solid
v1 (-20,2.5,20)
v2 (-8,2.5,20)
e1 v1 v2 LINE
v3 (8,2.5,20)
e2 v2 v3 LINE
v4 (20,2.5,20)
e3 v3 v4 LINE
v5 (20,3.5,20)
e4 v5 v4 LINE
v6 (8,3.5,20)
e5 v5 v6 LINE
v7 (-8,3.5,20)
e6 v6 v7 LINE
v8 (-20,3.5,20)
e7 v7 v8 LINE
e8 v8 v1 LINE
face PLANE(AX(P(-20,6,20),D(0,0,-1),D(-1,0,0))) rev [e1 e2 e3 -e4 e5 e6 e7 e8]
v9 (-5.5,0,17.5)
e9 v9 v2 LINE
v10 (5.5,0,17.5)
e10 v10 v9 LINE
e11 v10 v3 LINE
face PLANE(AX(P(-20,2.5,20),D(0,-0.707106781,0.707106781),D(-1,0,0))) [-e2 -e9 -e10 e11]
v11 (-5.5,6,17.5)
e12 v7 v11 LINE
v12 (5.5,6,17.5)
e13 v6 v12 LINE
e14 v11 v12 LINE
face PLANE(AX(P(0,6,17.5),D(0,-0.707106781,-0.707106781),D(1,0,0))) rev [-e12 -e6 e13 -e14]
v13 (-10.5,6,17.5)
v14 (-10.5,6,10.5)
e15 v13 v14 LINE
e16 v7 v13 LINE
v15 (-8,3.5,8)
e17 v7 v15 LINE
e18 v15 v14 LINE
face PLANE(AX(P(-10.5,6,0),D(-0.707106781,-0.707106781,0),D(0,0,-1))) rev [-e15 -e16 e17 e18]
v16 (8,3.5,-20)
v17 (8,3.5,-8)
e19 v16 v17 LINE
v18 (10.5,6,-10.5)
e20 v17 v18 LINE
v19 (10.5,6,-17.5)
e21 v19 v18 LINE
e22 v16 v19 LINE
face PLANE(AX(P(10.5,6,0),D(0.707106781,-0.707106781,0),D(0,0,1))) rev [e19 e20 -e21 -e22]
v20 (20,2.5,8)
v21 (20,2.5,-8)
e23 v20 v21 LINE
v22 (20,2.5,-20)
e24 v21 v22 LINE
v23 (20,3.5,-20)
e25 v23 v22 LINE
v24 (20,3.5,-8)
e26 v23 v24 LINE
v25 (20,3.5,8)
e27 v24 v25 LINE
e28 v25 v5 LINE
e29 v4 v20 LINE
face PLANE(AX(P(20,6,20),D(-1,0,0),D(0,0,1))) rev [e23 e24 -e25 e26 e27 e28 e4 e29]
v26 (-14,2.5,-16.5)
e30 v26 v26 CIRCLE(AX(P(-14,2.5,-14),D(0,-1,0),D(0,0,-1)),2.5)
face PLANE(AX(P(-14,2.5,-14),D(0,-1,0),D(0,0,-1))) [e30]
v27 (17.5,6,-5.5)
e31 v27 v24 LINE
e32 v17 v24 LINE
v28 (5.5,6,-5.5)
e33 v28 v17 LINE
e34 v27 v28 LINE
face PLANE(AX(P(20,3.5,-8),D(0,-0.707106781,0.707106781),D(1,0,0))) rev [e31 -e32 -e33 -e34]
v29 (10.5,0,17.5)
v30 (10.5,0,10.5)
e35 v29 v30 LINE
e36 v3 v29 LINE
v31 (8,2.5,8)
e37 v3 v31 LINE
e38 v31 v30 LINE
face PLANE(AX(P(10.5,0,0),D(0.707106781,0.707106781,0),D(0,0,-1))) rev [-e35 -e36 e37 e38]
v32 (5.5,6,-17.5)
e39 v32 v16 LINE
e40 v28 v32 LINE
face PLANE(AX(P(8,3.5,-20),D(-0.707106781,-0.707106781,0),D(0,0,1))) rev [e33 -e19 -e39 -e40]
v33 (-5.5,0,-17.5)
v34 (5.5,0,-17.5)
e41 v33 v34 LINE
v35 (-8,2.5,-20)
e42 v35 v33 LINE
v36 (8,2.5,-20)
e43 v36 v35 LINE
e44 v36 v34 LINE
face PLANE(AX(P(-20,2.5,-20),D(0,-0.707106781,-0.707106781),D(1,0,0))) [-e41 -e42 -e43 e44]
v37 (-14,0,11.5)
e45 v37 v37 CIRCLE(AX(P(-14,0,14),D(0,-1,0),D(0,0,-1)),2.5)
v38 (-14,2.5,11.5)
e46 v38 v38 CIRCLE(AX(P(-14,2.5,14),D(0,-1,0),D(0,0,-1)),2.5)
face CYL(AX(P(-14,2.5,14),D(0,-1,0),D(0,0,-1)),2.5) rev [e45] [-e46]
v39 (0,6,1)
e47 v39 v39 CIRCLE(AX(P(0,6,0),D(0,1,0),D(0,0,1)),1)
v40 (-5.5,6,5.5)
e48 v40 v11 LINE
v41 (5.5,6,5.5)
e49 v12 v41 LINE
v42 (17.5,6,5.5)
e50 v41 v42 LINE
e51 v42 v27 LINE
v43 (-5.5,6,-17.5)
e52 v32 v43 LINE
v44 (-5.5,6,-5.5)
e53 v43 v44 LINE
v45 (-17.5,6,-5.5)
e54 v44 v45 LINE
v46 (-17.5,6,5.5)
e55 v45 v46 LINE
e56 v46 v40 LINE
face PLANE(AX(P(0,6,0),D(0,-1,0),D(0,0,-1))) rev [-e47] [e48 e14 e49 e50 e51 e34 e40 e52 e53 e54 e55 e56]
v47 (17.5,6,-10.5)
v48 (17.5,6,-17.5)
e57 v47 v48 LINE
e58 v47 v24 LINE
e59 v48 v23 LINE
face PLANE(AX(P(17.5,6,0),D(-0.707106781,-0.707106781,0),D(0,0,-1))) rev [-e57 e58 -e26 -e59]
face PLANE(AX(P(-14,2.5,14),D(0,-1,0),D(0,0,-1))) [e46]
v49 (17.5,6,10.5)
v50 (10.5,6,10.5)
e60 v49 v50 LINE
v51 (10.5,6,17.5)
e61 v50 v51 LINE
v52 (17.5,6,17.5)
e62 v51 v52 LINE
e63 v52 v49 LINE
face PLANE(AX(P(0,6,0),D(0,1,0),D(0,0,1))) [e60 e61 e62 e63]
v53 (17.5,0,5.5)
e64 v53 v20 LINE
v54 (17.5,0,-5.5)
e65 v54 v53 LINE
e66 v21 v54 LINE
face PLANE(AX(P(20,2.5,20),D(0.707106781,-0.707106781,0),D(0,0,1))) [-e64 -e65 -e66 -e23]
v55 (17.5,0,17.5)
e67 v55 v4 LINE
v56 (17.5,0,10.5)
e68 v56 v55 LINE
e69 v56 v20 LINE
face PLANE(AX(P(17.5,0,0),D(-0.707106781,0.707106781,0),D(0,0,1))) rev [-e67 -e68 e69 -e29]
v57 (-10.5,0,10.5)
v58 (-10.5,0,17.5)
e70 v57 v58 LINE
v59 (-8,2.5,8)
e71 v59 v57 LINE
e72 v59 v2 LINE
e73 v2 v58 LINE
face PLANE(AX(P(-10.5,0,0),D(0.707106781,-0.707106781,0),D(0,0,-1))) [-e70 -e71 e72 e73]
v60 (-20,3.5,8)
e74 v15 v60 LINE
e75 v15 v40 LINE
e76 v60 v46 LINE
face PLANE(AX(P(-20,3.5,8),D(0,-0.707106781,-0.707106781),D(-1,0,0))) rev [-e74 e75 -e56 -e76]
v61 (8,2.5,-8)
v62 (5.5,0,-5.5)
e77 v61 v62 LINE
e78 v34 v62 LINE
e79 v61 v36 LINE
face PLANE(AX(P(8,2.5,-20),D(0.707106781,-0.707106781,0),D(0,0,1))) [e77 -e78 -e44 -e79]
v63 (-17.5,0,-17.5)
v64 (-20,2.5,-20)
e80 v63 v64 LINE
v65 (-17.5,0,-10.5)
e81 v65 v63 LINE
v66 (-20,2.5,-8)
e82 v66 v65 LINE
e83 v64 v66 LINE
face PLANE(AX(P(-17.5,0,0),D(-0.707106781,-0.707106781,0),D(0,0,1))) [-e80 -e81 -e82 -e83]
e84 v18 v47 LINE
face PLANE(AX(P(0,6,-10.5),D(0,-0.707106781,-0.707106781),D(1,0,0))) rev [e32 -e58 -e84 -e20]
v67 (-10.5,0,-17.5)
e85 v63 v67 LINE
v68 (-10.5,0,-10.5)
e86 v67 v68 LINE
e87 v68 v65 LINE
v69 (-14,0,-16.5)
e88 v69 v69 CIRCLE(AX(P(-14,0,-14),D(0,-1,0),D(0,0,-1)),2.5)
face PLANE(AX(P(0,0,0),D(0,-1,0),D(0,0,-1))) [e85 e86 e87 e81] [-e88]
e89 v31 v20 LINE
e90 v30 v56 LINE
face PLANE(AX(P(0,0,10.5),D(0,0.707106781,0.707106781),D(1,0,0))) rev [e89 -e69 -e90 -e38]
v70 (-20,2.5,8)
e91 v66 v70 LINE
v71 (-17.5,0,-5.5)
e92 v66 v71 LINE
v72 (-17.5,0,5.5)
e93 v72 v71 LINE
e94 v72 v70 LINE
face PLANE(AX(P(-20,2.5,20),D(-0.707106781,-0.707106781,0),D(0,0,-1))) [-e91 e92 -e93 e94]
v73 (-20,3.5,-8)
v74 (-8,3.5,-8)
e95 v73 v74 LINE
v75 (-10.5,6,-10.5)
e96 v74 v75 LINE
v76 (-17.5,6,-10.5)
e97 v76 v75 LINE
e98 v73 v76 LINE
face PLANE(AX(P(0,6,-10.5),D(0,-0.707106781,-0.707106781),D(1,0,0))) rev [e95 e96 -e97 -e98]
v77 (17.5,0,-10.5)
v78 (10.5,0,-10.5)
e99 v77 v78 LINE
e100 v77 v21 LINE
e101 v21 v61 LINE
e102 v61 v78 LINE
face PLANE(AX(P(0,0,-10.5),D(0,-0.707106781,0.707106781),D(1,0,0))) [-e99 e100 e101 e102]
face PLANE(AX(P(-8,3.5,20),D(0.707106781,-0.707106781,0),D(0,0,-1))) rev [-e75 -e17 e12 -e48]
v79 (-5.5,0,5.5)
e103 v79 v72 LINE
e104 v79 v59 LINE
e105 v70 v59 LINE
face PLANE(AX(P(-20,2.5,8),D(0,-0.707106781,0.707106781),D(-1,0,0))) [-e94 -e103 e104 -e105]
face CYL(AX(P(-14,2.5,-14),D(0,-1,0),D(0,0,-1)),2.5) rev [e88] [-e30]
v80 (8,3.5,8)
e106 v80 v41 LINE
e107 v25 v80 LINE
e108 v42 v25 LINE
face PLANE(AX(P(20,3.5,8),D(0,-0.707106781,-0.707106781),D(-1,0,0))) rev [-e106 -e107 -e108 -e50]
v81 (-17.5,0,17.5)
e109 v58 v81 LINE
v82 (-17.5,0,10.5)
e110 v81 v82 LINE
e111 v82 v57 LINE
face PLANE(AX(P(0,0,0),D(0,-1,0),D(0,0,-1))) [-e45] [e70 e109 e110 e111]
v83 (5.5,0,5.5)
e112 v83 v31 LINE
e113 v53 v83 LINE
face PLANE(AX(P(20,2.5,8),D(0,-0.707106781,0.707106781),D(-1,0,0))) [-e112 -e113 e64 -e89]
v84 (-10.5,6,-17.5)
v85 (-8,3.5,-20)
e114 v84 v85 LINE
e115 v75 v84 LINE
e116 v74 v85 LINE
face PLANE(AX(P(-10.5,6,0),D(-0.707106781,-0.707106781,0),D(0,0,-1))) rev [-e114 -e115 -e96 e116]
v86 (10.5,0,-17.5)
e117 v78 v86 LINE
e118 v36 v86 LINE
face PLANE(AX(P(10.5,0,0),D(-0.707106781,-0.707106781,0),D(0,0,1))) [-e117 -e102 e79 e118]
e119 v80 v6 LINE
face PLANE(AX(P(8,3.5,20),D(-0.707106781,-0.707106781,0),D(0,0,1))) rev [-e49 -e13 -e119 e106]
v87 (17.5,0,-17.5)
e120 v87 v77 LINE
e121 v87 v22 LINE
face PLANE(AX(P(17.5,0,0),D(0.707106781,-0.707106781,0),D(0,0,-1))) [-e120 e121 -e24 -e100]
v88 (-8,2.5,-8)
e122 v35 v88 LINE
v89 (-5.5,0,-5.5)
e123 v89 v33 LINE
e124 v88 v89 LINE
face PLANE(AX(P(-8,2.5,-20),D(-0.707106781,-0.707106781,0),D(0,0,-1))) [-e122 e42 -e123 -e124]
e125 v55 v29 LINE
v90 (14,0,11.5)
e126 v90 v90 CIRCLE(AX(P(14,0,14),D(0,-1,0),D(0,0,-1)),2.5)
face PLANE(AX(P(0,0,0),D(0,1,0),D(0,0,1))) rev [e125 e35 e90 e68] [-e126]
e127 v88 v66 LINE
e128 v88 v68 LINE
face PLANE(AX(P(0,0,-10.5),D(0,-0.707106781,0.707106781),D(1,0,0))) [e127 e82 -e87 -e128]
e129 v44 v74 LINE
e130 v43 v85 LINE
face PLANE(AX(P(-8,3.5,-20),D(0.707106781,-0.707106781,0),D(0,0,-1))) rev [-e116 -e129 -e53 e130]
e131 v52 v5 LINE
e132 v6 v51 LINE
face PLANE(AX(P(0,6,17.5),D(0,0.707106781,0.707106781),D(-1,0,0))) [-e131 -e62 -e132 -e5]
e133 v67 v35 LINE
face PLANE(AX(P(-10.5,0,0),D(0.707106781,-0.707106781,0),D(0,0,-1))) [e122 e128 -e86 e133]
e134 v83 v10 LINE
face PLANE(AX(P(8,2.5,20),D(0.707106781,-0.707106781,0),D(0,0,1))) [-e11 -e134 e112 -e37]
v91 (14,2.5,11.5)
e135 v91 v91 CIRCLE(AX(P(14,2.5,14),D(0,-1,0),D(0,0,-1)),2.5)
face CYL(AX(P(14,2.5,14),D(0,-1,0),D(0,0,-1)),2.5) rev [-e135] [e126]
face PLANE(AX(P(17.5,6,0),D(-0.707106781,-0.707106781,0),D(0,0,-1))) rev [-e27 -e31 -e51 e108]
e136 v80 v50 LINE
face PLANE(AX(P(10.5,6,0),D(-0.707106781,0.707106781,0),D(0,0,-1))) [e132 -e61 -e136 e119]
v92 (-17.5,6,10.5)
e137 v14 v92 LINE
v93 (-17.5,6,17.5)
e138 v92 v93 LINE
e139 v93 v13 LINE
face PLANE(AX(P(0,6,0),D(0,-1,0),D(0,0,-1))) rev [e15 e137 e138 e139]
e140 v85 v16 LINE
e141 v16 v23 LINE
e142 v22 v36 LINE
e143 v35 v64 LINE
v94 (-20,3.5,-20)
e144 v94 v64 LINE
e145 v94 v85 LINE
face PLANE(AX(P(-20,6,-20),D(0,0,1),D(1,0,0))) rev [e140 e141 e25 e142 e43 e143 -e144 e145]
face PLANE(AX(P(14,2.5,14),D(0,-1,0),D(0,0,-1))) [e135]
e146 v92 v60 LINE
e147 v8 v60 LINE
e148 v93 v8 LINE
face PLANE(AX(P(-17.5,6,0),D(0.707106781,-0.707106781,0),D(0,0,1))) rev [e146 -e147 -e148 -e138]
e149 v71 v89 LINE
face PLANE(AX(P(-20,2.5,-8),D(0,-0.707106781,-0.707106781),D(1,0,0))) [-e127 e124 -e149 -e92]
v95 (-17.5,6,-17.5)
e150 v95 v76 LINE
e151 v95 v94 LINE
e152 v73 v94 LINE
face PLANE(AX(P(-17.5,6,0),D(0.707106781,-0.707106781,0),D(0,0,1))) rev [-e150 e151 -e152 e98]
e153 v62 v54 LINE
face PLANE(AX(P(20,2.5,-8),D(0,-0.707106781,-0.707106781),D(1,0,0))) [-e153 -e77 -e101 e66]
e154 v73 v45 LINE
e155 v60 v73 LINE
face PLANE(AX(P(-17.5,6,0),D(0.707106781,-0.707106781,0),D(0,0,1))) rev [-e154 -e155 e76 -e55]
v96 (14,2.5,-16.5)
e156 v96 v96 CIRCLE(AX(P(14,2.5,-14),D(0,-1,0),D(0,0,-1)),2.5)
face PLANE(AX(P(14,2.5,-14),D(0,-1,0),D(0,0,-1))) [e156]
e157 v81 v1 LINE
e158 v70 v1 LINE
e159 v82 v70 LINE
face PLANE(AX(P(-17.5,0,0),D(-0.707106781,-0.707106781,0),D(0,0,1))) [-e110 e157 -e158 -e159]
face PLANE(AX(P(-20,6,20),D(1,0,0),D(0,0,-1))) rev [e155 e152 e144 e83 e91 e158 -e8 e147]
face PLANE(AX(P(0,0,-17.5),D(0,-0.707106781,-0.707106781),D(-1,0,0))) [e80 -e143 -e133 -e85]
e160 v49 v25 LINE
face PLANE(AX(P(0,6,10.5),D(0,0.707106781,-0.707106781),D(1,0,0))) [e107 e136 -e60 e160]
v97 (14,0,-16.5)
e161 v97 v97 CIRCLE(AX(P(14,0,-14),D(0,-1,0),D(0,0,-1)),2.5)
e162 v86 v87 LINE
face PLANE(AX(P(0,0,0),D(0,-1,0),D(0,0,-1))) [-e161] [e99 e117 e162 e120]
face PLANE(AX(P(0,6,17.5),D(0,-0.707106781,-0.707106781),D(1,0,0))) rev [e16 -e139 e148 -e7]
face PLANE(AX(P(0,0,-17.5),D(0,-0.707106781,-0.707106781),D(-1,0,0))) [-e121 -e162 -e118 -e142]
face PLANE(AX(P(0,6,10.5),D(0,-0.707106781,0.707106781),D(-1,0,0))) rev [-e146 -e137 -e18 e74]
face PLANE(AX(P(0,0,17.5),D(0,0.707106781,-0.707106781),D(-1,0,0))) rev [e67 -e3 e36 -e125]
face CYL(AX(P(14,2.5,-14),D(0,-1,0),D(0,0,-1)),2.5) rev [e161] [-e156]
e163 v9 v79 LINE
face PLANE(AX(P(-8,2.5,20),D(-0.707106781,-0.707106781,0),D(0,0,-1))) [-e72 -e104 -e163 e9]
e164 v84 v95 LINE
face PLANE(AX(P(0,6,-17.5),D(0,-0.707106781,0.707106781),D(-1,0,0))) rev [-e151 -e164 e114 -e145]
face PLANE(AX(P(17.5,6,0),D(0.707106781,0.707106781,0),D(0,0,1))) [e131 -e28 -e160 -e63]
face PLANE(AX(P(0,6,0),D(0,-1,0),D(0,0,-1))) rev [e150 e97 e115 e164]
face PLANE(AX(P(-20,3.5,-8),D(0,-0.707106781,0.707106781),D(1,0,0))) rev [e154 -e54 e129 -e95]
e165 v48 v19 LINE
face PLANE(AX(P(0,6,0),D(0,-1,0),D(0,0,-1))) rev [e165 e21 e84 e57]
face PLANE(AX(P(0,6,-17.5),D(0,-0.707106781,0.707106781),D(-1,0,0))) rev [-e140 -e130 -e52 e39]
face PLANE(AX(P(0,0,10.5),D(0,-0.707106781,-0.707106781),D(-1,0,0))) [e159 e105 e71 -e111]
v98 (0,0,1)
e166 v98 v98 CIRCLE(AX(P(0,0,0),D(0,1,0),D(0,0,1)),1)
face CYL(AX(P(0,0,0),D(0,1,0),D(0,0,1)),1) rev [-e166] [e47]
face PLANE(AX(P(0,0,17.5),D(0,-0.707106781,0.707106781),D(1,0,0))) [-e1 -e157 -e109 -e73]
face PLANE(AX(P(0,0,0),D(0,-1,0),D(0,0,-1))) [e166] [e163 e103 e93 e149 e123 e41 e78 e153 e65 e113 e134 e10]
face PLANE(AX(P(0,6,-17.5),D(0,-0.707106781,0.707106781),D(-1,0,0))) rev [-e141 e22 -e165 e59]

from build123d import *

# Parameters (mm, degrees)
SKETCH1_W           = 40
SKETCH1_H           = 40
BOSS_EXTRUDE1_DEPTH = 6
SKETCH2_W           = 12
SKETCH2_H           = 12
CUT_EXTRUDE1_DEPTH  = 2.5
SKETCH3_W           = 12
SKETCH3_H           = 12
CUT_EXTRUDE2_DEPTH  = 2.5
CHAMFER1_SIZE       = 2.5
SKETCH4_W           = 12
SKETCH4_H           = 12
BOSS_EXTRUDE2_DEPTH = 2.5
SKETCH5_W           = 12
SKETCH5_H           = 12
BOSS_EXTRUDE3_DEPTH = 2.5
CHAMFER2_SIZE       = 2.5
SKETCH6_R           = 2.5
CUT_EXTRUDE3_DEPTH  = 2.5
SKETCH7_R           = 1
CUT_EXTRUDE4_DEPTH  = 29.91366459


# Some blends are built 0.0001 mm under size
with BuildPart() as part:
    # Sketch1 → Boss-Extrude1 (new body)
    with BuildSketch(Plane(origin=(0, 0, 0), x_dir=(1, 0, 0), z_dir=(0, 1, 0))):
        Rectangle(SKETCH1_W, SKETCH1_H)
    extrude(amount=BOSS_EXTRUDE1_DEPTH)

    # Sketch2 → Cut-Extrude1 (cut)
    with BuildSketch(Plane.XZ):
        with Locations((14, 14)):
            Rectangle(SKETCH2_W, SKETCH2_H)
        with Locations((-14, 14)):
            Rectangle(SKETCH2_W, SKETCH2_H)
        with Locations((14, -14)):
            Rectangle(SKETCH2_W, SKETCH2_H)
        with Locations((-14, -14)):
            Rectangle(SKETCH2_W, SKETCH2_H)
    extrude(amount=-CUT_EXTRUDE1_DEPTH, mode=Mode.SUBTRACT)

    # Sketch3 → Cut-Extrude2 (cut)
    with BuildSketch(Plane(origin=(0, 6, 0), x_dir=(1, 0, 0), z_dir=(0, 1, 0))):
        with Locations((14, 14)):
            Rectangle(SKETCH3_W, SKETCH3_H)
        with Locations((-14, 14)):
            Rectangle(SKETCH3_W, SKETCH3_H)
        with Locations((14, -14)):
            Rectangle(SKETCH3_W, SKETCH3_H)
        with Locations((-14, -14)):
            Rectangle(SKETCH3_W, SKETCH3_H)
    extrude(amount=-CUT_EXTRUDE2_DEPTH, mode=Mode.SUBTRACT)

    # Chamfer1
    chamfer1_edges = [part.edges().sort_by_distance(p)[0] for p in [
        (-14, 6, -8),
        (-8, 6, -14),
        (0, 6, -20),
        (8, 6, -14),
        (14, 6, -8),
        (20, 6, 0),
        (14, 6, 8),
        (8, 6, 14),
        (0, 6, 20),
        (-8, 6, 14),
        (-14, 6, 8),
        (-20, 6, 0),
        (-20, 0, 0),
        (-14, 0, 8),
        (-8, 0, 14),
        (0, 0, 20),
        (8, 0, 14),
        (14, 0, 8),
        (20, 0, 0),
        (14, 0, -8),
        (8, 0, -14),
        (0, 0, -20),
        (-8, 0, -14),
        (-14, 0, -8),
    ]]
    chamfer(chamfer1_edges, length=CHAMFER1_SIZE - 0.0001)  # a hair under: the kernel refuses the full size

    # Sketch4 → Boss-Extrude2 (add)
    with BuildSketch(Plane.XZ.offset(-2.5)):
        with Locations((14, -14)):
            Rectangle(SKETCH4_W, SKETCH4_H)
        with Locations((14, 14)):
            Rectangle(SKETCH4_W, SKETCH4_H)
        with Locations((-14, -14)):
            Rectangle(SKETCH4_W, SKETCH4_H)
        with Locations((-14, 14)):
            Rectangle(SKETCH4_W, SKETCH4_H)
    extrude(amount=BOSS_EXTRUDE2_DEPTH)

    # Sketch5 → Boss-Extrude3 (add)
    with BuildSketch(Plane(origin=(0, 3.5, 0), x_dir=(1, 0, 0), z_dir=(0, 1, 0))):
        with Locations((-14, -14)):
            Rectangle(SKETCH5_W, SKETCH5_H)
        with Locations((14, -14)):
            Rectangle(SKETCH5_W, SKETCH5_H)
        with Locations((-14, 14)):
            Rectangle(SKETCH5_W, SKETCH5_H)
        with Locations((14, 14)):
            Rectangle(SKETCH5_W, SKETCH5_H)
    extrude(amount=BOSS_EXTRUDE3_DEPTH)

    # Chamfer2
    # the kernel refuses this chamfer: 2.5 mm, written as the material it takes off along each edge
    with BuildSketch(Plane(origin=(8, 6, 8), x_dir=(0, -0.9996219169112968, -0.027495876610586317), z_dir=(1, 0, 0)), Plane(origin=(-26.42920747, 0, -8), x_dir=(0, 0.9996219169112968, 0.027495876610586317), z_dir=(1, 0, 0)), Plane(origin=(-8, 0, 8), x_dir=(0, 0.9996219169112968, -0.027495876610586317), z_dir=(-1, 0, 0)), Plane(origin=(-26.42920747, 6, -8), x_dir=(6.9547671466025935e-15, 0.027495876610586317, -0.9996219169112968), z_dir=(1, 0, 0))) as chamfer2_piece_1:
        Polygon((CHAMFER2_SIZE * 0.999621916911, -CHAMFER2_SIZE * 0.0274958766106), (-CHAMFER2_SIZE * 0.0274958766106, -CHAMFER2_SIZE * 0.999621916911), (0, 0), align=None)
    extrude(amount=18.42920747, mode=Mode.SUBTRACT)
    with BuildSketch(Plane(origin=(20, 6, 1.57079253), x_dir=(0.027495876610586317, -0.9996219169112968, -1.2780451150309794e-15), z_dir=(0, 0, 1)), Plane(origin=(26.42920747, 6, 20), x_dir=(0, -0.9996219169112968, 0.027495876610586317), z_dir=(-1, 0, 0)), Plane(origin=(-20, 0, 1.57079253), x_dir=(-0.027495876610586317, 0.9996219169112968, 0), z_dir=(0, 0, 1)), Plane(origin=(-26.42920747, 0, 20), x_dir=(0, 0.9996219169112968, 0.027495876610586317), z_dir=(1, 0, 0)), Plane(origin=(20, 0, 1.57079253), x_dir=(-0.9996219169112968, -0.027495876610586372, 0), z_dir=(0, 0, 1)), Plane(origin=(26.42920747, 0, -20), x_dir=(0, 0.9996219169112968, -0.027495876610586317), z_dir=(-1, 0, 0)), Plane(origin=(20, 6, -1.57079253), x_dir=(-0.9996219169112968, 0.027495876610586317, -1.0358163835365089e-14), z_dir=(0, 0, -1)), Plane(origin=(-20, 6, -26.42920747), x_dir=(0.9996219169112968, 0.027495876610586317, -3.936102257438915e-14), z_dir=(0, 0, 1)), Plane(origin=(-20, 6, 1.57079253), x_dir=(0.9996219169112968, 0.027495876610586317, 3.5513704578394593e-15), z_dir=(0, 0, 1))) as chamfer2_piece_2:
        Polygon((CHAMFER2_SIZE * 0.999621916911, -CHAMFER2_SIZE * 0.0274958766106), (-CHAMFER2_SIZE * 0.0274958766106, -CHAMFER2_SIZE * 0.999621916911), (0, 0), align=None)
    extrude(amount=24.85841494, mode=Mode.SUBTRACT)
    with BuildSketch(Plane(origin=(8, 6, 26.42920747), x_dir=(0.9996219169112968, 0.027495876610586317, 0), z_dir=(0, 0, -1)), Plane(origin=(-8, 0, -8), x_dir=(-0.9996219169112968, -0.02749587661058636, 0), z_dir=(0, 0, -1)), Plane(origin=(-8, 0, 26.42920747), x_dir=(-0.9996219169112968, -0.027495876610586372, 0), z_dir=(0, 0, -1)), Plane(origin=(8, 0, 26.42920747), x_dir=(-0.027495876610586317, 0.9996219169112968, 0), z_dir=(0, 0, -1)), Plane(origin=(8, 0, -8), x_dir=(0, -0.027495876610586372, -0.9996219169112968), z_dir=(1, 0, 0)), Plane(origin=(8, 0, -26.42920747), x_dir=(0.9996219169112968, -0.027495876610586372, 0), z_dir=(0, 0, 1)), Plane(origin=(8, 6, -8), x_dir=(0, -0.9996219169112968, 0.027495876610586317), z_dir=(1, 0, 0)), Plane(origin=(8, 6, -26.42920747), x_dir=(-0.027495876610586317, -0.9996219169112968, 0), z_dir=(0, 0, 1)), Plane(origin=(-8, 6, 8), x_dir=(0, -0.9996219169112968, -0.027495876610586317), z_dir=(-1, 0, 0)), Plane(origin=(-8, 6, 26.42920747), x_dir=(0.027495876610586317, -0.9996219169112968, 0), z_dir=(0, 0, -1))) as chamfer2_piece_3:
        Polygon((CHAMFER2_SIZE * 0.999621916911, CHAMFER2_SIZE * 0.0274958766106), (-CHAMFER2_SIZE * 0.0274958766106, CHAMFER2_SIZE * 0.999621916911), (0, 0), align=None)
    extrude(amount=18.42920747, mode=Mode.SUBTRACT)
    with BuildSketch(Plane(origin=(-1.57079253, 0, -20), x_dir=(0, -0.027495876610586372, 0.9996219169112968), z_dir=(-1, 0, 0)), Plane(origin=(-20, 0, -26.42920747), x_dir=(0.9996219169112968, -0.027495876610586372, -6.510845839372511e-15), z_dir=(0, 0, 1)), Plane(origin=(26.42920747, 0, 20), x_dir=(0, 0.9996219169112968, 0.027495876610586317), z_dir=(-1, 0, 0)), Plane(origin=(20, 0, -1.57079253), x_dir=(-0.9996219169112968, -0.027495876610586372, 0), z_dir=(0, 0, -1)), Plane(origin=(26.42920747, 6, -20), x_dir=(0, -0.9996219169112968, -0.027495876610586317), z_dir=(-1, 0, 0)), Plane(origin=(-1.57079253, 6, -20), x_dir=(0, -0.9996219169112968, -0.027495876610586317), z_dir=(-1, 0, 0)), Plane(origin=(-26.42920747, 6, 20), x_dir=(1.1722197233405161e-15, -0.9996219169112968, 0.027495876610586317), z_dir=(1, 0, 0))) as chamfer2_piece_4:
        Polygon((CHAMFER2_SIZE * 0.999621916911, CHAMFER2_SIZE * 0.0274958766106), (-CHAMFER2_SIZE * 0.0274958766106, CHAMFER2_SIZE * 0.999621916911), (0, 0), align=None)
    extrude(amount=24.85841494, mode=Mode.SUBTRACT)
    with BuildSketch(Plane(origin=(1.57079253, 0, 8), x_dir=(0, 0.9996219169112968, -0.027495876610586317), z_dir=(1, 0, 0))) as chamfer2_piece_5_section:
        Polygon((CHAMFER2_SIZE * 0.999621916911, CHAMFER2_SIZE * 0.0274958766106), (-CHAMFER2_SIZE * 0.0274958766106, CHAMFER2_SIZE * 0.999621916911), (0, 0), align=None)
    chamfer2_piece_5 = extrude(amount=24.85841494, mode=Mode.PRIVATE)
    chamfer2_piece_5 = split(chamfer2_piece_5, bisect_by=Plane(origin=(9.775276368, 4.275176368, 8.816532421), z_dir=(0.7071067811865475, -0.7071067811865476, -2.3845673236902997e-15)), keep=Keep.TOP, mode=Mode.PRIVATE)
    add(chamfer2_piece_5, mode=Mode.SUBTRACT)
    with BuildSketch(Plane(origin=(-8, 6, -1.57079253), x_dir=(-0.9996219169112968, 0.027495876610586317, -7.028754031140922e-15), z_dir=(0, 0, -1))) as chamfer2_piece_6_section:
        Polygon((CHAMFER2_SIZE * 0.999621916911, -CHAMFER2_SIZE * 0.0274958766106), (-CHAMFER2_SIZE * 0.0274958766106, -CHAMFER2_SIZE * 0.999621916911), (0, 0), align=None)
    chamfer2_piece_6 = extrude(amount=24.85841494, mode=Mode.PRIVATE)
    chamfer2_piece_6 = split(chamfer2_piece_6, bisect_by=Plane(origin=(-8.816532421, 1.724823632, -9.775276368), z_dir=(0, 0.7071067811865476, -0.7071067811865475)), keep=Keep.TOP, mode=Mode.PRIVATE)
    add(chamfer2_piece_6, mode=Mode.SUBTRACT)

    # Sketch6 → Cut-Extrude3 (cut)
    with BuildSketch(Plane.XZ):
        with Locations(Location((14, 14, 0), (0, 0, 270))):
            Circle(SKETCH6_R)
        with Locations(Location((14, -14, 0), (0, 0, 270))):
            Circle(SKETCH6_R)
        with Locations(Location((-14, -14, 0), (0, 0, 270))):
            Circle(SKETCH6_R)
        with Locations(Location((-14, 14, 0), (0, 0, 270))):
            Circle(SKETCH6_R)
    extrude(amount=-CUT_EXTRUDE3_DEPTH, mode=Mode.SUBTRACT)

    # Sketch7 → Cut-Extrude4 (cut, through all)
    with BuildSketch(Plane(origin=(0, 6, 0), x_dir=(1, 0, 0), z_dir=(0, 1, 0))):
        with Locations(Location((0, 0, 0), (0, 0, 270))):
            Circle(SKETCH7_R)
    extrude(amount=-CUT_EXTRUDE4_DEPTH, mode=Mode.SUBTRACT)


solid = part.part
